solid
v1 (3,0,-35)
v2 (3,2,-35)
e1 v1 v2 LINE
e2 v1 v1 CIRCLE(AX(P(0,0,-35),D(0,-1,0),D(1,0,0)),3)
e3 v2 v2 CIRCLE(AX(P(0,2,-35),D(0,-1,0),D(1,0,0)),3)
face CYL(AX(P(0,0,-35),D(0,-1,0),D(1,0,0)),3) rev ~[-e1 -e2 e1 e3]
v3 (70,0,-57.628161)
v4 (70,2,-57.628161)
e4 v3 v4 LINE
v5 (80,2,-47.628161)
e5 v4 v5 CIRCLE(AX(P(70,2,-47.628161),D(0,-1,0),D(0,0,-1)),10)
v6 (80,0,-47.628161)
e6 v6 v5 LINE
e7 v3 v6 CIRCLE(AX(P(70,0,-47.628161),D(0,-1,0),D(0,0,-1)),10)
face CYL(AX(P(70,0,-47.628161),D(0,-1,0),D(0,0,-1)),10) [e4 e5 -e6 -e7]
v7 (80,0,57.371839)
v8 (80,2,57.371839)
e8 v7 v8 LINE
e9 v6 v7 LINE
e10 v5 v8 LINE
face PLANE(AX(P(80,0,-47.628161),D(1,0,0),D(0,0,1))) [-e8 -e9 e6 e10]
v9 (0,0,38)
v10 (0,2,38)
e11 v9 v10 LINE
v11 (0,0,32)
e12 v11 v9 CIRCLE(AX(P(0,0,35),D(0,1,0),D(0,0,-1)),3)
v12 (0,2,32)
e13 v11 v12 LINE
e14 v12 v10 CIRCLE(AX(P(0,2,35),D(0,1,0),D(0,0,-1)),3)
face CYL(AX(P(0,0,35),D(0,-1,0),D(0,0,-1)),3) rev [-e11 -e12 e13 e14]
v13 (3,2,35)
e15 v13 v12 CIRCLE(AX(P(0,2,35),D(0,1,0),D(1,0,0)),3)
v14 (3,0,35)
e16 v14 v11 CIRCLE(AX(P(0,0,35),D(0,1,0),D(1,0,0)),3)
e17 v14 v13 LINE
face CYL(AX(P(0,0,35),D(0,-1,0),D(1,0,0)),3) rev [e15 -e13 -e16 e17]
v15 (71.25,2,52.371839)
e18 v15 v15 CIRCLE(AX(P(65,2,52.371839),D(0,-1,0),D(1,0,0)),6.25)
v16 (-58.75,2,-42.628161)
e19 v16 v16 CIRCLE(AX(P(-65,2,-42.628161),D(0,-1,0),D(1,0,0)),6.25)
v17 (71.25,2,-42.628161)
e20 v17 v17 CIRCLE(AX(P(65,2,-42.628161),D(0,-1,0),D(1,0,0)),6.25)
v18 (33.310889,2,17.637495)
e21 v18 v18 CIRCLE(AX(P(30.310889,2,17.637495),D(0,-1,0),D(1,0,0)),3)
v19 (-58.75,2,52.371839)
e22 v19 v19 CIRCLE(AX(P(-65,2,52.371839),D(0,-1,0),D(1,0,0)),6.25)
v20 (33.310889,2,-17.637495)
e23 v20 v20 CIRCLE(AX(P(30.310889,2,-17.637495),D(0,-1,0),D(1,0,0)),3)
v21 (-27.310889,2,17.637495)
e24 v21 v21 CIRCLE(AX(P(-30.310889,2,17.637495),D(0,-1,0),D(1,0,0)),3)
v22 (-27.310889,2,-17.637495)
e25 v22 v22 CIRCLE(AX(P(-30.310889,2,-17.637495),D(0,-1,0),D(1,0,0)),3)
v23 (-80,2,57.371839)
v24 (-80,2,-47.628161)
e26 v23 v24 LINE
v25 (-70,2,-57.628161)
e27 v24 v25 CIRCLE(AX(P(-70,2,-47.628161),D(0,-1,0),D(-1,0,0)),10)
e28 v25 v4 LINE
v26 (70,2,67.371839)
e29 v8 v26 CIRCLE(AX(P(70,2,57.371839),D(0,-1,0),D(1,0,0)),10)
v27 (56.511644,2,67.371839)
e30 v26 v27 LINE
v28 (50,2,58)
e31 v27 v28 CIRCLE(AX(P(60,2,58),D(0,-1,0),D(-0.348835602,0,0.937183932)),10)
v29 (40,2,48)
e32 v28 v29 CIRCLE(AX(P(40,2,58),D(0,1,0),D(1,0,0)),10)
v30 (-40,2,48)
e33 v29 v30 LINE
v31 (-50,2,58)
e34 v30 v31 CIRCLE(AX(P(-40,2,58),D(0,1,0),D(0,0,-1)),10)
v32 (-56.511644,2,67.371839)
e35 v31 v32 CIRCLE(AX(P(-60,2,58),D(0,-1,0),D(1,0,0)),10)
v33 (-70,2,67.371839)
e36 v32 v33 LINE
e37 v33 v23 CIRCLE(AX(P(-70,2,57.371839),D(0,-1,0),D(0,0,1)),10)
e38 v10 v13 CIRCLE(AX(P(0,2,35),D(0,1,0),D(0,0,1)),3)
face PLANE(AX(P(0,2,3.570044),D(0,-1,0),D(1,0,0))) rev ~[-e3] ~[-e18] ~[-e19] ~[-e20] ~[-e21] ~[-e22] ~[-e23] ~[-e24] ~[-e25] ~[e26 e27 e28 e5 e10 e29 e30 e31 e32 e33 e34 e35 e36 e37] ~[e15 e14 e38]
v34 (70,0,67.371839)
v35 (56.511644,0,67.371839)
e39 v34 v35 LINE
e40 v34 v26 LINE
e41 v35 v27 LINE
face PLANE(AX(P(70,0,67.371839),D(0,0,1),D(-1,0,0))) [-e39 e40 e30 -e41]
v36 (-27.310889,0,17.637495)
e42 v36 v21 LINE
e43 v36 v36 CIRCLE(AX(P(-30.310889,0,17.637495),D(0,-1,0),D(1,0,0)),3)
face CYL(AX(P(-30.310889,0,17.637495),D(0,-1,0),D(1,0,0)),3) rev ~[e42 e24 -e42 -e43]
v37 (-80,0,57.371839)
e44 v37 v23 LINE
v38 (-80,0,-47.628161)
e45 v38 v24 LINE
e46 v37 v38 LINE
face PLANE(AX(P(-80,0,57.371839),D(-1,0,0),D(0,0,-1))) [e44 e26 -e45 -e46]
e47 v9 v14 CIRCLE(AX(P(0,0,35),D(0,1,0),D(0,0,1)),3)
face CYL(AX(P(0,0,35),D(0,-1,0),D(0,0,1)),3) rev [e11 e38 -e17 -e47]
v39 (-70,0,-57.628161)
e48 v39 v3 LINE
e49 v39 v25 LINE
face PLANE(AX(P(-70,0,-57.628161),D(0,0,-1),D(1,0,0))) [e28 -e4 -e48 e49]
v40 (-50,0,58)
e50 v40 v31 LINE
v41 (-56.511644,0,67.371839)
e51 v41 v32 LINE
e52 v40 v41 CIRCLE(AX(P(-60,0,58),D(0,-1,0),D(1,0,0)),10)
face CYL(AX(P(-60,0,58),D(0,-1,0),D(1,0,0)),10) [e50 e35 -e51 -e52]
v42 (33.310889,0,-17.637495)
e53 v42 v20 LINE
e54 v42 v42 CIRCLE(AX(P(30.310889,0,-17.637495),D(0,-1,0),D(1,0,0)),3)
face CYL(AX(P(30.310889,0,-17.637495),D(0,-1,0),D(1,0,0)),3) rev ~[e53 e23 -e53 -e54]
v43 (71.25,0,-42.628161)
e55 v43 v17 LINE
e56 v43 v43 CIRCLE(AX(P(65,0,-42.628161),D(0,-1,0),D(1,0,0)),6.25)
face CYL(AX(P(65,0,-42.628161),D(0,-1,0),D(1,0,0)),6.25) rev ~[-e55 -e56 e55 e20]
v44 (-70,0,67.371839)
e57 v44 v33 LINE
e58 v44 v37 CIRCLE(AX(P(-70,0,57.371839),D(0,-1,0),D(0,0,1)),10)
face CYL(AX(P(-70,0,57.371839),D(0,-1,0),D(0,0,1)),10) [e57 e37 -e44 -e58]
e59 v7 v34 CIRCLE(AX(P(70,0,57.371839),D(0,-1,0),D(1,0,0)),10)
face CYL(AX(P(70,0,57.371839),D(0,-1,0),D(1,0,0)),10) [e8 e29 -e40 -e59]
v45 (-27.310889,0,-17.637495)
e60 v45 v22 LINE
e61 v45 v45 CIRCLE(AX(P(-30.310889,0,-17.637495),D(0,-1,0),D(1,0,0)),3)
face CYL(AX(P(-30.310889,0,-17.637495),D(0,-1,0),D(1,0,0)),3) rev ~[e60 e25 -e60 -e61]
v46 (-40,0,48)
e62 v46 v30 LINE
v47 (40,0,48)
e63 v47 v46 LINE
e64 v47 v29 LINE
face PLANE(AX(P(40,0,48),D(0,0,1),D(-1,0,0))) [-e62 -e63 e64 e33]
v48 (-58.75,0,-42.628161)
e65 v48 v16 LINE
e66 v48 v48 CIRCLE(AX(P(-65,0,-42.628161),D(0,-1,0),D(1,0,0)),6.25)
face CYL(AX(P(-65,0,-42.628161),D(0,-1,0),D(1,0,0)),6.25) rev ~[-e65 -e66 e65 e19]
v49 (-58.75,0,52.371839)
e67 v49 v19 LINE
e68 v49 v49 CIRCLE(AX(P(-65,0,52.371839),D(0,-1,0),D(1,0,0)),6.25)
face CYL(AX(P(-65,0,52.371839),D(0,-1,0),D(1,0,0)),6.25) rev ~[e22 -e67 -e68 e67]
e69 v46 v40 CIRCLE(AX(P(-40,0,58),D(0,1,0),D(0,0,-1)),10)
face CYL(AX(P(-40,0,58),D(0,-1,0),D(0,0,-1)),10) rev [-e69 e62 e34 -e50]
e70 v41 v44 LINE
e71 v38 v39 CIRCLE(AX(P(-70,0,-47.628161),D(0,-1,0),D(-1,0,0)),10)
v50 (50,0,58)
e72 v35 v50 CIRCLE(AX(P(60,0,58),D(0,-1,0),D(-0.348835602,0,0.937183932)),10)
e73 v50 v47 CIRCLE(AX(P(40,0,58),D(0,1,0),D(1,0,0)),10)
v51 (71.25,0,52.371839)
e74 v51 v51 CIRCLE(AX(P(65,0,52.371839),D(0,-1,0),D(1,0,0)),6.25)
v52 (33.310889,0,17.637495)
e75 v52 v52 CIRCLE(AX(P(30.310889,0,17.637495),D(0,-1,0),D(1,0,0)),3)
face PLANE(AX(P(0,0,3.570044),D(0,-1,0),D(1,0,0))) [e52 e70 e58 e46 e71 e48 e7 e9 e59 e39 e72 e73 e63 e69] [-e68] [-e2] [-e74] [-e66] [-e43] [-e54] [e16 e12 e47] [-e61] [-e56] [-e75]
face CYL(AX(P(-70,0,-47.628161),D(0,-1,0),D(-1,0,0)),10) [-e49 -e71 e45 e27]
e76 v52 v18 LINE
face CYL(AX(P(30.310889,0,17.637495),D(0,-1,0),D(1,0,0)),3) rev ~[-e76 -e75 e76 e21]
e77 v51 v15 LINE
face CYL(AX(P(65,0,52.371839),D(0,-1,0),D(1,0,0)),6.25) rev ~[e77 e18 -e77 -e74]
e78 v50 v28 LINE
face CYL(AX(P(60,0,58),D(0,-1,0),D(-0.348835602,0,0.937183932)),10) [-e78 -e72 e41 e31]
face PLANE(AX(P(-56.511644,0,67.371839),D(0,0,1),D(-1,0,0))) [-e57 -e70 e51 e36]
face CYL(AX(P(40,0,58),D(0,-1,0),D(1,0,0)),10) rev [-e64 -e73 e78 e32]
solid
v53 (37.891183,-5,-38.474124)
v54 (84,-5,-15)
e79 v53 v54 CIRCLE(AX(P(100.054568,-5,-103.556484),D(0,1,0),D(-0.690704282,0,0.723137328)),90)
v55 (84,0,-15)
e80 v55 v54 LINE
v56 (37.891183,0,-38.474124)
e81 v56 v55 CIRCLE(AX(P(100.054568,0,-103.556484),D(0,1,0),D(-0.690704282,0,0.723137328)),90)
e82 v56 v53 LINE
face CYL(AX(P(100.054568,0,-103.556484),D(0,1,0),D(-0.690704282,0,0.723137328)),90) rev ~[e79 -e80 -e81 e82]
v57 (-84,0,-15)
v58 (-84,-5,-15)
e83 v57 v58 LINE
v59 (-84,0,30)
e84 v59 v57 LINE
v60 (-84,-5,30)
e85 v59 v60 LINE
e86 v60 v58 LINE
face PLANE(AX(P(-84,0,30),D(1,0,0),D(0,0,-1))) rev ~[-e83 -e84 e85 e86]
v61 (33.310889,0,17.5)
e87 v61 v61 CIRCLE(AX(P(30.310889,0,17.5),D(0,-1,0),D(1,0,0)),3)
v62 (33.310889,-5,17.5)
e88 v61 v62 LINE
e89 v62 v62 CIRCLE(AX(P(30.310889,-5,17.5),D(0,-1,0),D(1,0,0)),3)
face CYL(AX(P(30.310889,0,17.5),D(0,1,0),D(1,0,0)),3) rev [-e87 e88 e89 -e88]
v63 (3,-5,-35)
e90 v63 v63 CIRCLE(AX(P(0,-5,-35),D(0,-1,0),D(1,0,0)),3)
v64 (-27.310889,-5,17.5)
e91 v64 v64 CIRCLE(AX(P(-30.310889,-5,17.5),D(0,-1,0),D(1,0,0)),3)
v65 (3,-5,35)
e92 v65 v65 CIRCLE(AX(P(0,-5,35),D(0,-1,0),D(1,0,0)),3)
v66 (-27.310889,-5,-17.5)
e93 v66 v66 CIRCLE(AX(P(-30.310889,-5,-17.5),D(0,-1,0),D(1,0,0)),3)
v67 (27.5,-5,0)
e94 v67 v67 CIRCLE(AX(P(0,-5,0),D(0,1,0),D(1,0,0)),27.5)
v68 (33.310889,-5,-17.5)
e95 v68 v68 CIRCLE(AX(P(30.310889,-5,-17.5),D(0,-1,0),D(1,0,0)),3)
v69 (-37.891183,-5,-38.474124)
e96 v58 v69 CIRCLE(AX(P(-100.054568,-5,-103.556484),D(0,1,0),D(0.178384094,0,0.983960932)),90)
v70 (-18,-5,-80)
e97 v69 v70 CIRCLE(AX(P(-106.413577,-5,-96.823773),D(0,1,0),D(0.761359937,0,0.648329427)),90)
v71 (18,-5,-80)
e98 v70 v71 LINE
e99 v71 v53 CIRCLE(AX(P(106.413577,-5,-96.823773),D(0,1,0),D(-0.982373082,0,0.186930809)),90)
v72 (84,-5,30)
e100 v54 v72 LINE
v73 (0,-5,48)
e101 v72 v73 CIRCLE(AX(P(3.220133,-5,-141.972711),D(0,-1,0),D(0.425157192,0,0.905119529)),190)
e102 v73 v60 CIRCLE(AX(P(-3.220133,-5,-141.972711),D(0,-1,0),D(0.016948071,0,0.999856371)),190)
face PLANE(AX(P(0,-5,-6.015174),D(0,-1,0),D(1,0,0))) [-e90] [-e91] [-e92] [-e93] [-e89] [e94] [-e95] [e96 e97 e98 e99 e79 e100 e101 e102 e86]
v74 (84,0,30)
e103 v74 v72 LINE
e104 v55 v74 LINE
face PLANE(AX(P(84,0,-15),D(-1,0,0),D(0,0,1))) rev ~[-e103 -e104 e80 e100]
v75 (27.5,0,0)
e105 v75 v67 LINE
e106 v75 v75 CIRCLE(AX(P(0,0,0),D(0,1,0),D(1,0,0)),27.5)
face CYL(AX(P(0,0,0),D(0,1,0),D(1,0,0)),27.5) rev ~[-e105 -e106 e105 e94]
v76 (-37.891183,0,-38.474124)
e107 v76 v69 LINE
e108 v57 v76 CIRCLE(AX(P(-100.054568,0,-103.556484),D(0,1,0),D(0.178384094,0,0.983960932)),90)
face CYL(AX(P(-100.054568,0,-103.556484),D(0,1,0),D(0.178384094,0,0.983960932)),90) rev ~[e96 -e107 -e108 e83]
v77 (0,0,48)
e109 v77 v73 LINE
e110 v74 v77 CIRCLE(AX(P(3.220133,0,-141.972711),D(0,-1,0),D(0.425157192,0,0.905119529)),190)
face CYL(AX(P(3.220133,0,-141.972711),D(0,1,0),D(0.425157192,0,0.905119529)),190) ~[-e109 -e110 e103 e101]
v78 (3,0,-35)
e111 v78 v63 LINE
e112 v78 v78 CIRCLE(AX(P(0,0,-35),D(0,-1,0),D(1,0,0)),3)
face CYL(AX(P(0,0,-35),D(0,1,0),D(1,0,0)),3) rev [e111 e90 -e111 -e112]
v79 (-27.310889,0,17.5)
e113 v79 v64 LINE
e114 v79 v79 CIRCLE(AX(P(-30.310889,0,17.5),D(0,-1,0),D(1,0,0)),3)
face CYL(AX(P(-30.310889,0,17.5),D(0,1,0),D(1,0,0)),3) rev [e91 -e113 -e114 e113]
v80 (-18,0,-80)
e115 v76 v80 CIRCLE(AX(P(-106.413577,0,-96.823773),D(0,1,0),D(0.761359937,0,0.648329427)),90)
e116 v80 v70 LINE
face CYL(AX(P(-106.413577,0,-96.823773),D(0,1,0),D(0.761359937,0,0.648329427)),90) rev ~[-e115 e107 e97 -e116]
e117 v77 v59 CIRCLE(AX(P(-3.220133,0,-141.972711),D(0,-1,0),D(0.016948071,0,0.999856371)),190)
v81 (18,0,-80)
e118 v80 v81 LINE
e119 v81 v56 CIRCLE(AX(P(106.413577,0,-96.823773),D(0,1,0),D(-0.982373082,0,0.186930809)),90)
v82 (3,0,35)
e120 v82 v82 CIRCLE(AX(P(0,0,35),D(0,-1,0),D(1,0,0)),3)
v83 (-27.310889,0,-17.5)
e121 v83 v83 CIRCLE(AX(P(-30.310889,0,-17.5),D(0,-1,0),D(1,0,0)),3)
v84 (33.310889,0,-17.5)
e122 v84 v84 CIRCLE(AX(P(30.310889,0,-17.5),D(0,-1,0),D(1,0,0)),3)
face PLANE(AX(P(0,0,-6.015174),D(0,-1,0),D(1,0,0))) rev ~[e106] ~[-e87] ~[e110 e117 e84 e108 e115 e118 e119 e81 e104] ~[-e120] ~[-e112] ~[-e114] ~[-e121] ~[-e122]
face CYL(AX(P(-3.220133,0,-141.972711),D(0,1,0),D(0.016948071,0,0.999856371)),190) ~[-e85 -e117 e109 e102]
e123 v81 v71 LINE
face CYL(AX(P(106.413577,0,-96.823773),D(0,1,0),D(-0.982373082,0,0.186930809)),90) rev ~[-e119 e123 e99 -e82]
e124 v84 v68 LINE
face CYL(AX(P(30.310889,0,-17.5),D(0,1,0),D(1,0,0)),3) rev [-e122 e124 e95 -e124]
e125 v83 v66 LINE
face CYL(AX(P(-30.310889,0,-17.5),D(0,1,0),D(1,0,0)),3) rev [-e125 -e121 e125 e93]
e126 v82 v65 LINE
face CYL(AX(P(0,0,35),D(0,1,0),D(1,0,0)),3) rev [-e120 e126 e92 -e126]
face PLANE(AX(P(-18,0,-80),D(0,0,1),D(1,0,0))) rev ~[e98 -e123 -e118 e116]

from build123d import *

# Parameters (mm, degrees)
F0_R     = 3
F1_DEPTH = 5
F2_R     = 6.25
F2_R_2   = 3
F3_DEPTH = 2


# Not quite as in the source:
# - a feature names something its author has since deleted; it is built from what else it names


with BuildPart() as f1:
    # F0 (on Front) → F1 (new body)
    with BuildSketch(Plane.XZ):
        with BuildLine():
            ThreePointArc((18, -80), (25.2450835608, -57.9435000854), (37.8911830779, -38.474124356))
            ThreePointArc((37.8911830779, -38.474124356), (59.2223421632, -23.3521866114), (84, -15))
            Line((84, -15), (84, 30))
            ThreePointArc((84, 30), (43.0306603199, 43.8097481595), (0, 48))
            ThreePointArc((0, 48), (-43.0306603199, 43.8097481595), (-84, 30))
            Line((-84, 30), (-84, -15))
            ThreePointArc((-84, -15), (-59.2223421632, -23.3521866114), (-37.8911830779, -38.474124356))
            ThreePointArc((-37.8911830779, -38.474124356), (-25.2450835608, -57.9435000854), (-18, -80))
            Line((-18, -80), (0, -80))
            Line((0, -80), (18, -80))
        make_face()
        with Locations((-30.3108891325, -17.5)):
            Circle(F0_R, mode=Mode.SUBTRACT)
        with Locations((0, -35)):
            Circle(F0_R, mode=Mode.SUBTRACT)
        with Locations((30.3108891325, -17.5)):
            Circle(F0_R, mode=Mode.SUBTRACT)
        with Locations((-30.3108891325, 17.5)):
            Circle(F0_R, mode=Mode.SUBTRACT)
        with BuildLine():
            ThreePointArc((19.2964358267, -19.5933040702), (-25.3663358138, 10.6206877076), (27.5, 0))
            ThreePointArc((27.5, 0), (25.3663358138, -10.6206877076), (19.2964358267, -19.5933040702))
        make_face(mode=Mode.SUBTRACT)
        with Locations((30.3108891325, 17.5)):
            Circle(F0_R, mode=Mode.SUBTRACT)
        with Locations((0, 35)):
            Circle(F0_R, mode=Mode.SUBTRACT)
    extrude(amount=F1_DEPTH)


with BuildPart() as f3:
    # F2 (on Front) → F3 (new body)
    with BuildSketch(Plane.XZ):
        with BuildLine():
            ThreePointArc((-40, 48), (-47.0710678119, 50.9289321881), (-50, 58))
            ThreePointArc((-50, 58), (-51.7877055527, 63.7059810647), (-56.5116439822, 67.3718393228))
            Line((-56.5116439822, 67.3718393228), (-70, 67.3718393228))
            ThreePointArc((-70, 67.3718393228), (-77.0710678119, 64.4429071347), (-80, 57.3718393228))
            Line((-80, 57.3718393228), (-80, -47.6281606772))
            ThreePointArc((-80, -47.6281606772), (-77.0710678119, -54.699228489), (-70, -57.6281606772))
            Line((-70, -57.6281606772), (0, -57.6281606772))
            Line((0, -57.6281606772), (70, -57.6281606772))
            ThreePointArc((70, -57.6281606772), (77.0710678119, -54.699228489), (80, -47.6281606772))
            Line((80, -47.6281606772), (80, 57.3718393228))
            ThreePointArc((80, 57.3718393228), (77.0710678119, 64.4429071347), (70, 67.3718393228))
            Line((70, 67.3718393228), (56.5116439822, 67.3718393228))
            ThreePointArc((56.5116439822, 67.3718393228), (51.7877055527, 63.7059810647), (50, 58))
            ThreePointArc((50, 58), (47.0710678119, 50.9289321881), (40, 48))
            Line((40, 48), (0, 48))
            Line((0, 48), (-40, 48))
        make_face()
        with Locations((-65, -42.6281606772)):
            Circle(F2_R, mode=Mode.SUBTRACT)
        with Locations((-30.3108891325, -17.6374954636)):
            Circle(F2_R_2, mode=Mode.SUBTRACT)
        with Locations((0, -35)):
            Circle(F2_R_2, mode=Mode.SUBTRACT)
        with Locations((65, -42.6281606772)):
            Circle(F2_R, mode=Mode.SUBTRACT)
        with Locations((30.3108891325, -17.6374954636)):
            Circle(F2_R_2, mode=Mode.SUBTRACT)
        with Locations((-30.3108891325, 17.6374954636)):
            Circle(F2_R_2, mode=Mode.SUBTRACT)
        with Locations((-65, 52.3718393228)):
            Circle(F2_R, mode=Mode.SUBTRACT)
        with Locations((30.3108891325, 17.6374954636)):
            Circle(F2_R_2, mode=Mode.SUBTRACT)
        with BuildLine():
            ThreePointArc((0, 32), (-3, 35), (0, 38))
            ThreePointArc((0, 38), (2.1213203436, 37.1213203436), (3, 35))
            ThreePointArc((3, 35), (2.1213203436, 32.8786796564), (0, 32))
        make_face(mode=Mode.SUBTRACT)
        with Locations((65, 52.3718393228)):
            Circle(F2_R, mode=Mode.SUBTRACT)
    extrude(amount=-F3_DEPTH)


solid = Compound([f1.part, f3.part])
